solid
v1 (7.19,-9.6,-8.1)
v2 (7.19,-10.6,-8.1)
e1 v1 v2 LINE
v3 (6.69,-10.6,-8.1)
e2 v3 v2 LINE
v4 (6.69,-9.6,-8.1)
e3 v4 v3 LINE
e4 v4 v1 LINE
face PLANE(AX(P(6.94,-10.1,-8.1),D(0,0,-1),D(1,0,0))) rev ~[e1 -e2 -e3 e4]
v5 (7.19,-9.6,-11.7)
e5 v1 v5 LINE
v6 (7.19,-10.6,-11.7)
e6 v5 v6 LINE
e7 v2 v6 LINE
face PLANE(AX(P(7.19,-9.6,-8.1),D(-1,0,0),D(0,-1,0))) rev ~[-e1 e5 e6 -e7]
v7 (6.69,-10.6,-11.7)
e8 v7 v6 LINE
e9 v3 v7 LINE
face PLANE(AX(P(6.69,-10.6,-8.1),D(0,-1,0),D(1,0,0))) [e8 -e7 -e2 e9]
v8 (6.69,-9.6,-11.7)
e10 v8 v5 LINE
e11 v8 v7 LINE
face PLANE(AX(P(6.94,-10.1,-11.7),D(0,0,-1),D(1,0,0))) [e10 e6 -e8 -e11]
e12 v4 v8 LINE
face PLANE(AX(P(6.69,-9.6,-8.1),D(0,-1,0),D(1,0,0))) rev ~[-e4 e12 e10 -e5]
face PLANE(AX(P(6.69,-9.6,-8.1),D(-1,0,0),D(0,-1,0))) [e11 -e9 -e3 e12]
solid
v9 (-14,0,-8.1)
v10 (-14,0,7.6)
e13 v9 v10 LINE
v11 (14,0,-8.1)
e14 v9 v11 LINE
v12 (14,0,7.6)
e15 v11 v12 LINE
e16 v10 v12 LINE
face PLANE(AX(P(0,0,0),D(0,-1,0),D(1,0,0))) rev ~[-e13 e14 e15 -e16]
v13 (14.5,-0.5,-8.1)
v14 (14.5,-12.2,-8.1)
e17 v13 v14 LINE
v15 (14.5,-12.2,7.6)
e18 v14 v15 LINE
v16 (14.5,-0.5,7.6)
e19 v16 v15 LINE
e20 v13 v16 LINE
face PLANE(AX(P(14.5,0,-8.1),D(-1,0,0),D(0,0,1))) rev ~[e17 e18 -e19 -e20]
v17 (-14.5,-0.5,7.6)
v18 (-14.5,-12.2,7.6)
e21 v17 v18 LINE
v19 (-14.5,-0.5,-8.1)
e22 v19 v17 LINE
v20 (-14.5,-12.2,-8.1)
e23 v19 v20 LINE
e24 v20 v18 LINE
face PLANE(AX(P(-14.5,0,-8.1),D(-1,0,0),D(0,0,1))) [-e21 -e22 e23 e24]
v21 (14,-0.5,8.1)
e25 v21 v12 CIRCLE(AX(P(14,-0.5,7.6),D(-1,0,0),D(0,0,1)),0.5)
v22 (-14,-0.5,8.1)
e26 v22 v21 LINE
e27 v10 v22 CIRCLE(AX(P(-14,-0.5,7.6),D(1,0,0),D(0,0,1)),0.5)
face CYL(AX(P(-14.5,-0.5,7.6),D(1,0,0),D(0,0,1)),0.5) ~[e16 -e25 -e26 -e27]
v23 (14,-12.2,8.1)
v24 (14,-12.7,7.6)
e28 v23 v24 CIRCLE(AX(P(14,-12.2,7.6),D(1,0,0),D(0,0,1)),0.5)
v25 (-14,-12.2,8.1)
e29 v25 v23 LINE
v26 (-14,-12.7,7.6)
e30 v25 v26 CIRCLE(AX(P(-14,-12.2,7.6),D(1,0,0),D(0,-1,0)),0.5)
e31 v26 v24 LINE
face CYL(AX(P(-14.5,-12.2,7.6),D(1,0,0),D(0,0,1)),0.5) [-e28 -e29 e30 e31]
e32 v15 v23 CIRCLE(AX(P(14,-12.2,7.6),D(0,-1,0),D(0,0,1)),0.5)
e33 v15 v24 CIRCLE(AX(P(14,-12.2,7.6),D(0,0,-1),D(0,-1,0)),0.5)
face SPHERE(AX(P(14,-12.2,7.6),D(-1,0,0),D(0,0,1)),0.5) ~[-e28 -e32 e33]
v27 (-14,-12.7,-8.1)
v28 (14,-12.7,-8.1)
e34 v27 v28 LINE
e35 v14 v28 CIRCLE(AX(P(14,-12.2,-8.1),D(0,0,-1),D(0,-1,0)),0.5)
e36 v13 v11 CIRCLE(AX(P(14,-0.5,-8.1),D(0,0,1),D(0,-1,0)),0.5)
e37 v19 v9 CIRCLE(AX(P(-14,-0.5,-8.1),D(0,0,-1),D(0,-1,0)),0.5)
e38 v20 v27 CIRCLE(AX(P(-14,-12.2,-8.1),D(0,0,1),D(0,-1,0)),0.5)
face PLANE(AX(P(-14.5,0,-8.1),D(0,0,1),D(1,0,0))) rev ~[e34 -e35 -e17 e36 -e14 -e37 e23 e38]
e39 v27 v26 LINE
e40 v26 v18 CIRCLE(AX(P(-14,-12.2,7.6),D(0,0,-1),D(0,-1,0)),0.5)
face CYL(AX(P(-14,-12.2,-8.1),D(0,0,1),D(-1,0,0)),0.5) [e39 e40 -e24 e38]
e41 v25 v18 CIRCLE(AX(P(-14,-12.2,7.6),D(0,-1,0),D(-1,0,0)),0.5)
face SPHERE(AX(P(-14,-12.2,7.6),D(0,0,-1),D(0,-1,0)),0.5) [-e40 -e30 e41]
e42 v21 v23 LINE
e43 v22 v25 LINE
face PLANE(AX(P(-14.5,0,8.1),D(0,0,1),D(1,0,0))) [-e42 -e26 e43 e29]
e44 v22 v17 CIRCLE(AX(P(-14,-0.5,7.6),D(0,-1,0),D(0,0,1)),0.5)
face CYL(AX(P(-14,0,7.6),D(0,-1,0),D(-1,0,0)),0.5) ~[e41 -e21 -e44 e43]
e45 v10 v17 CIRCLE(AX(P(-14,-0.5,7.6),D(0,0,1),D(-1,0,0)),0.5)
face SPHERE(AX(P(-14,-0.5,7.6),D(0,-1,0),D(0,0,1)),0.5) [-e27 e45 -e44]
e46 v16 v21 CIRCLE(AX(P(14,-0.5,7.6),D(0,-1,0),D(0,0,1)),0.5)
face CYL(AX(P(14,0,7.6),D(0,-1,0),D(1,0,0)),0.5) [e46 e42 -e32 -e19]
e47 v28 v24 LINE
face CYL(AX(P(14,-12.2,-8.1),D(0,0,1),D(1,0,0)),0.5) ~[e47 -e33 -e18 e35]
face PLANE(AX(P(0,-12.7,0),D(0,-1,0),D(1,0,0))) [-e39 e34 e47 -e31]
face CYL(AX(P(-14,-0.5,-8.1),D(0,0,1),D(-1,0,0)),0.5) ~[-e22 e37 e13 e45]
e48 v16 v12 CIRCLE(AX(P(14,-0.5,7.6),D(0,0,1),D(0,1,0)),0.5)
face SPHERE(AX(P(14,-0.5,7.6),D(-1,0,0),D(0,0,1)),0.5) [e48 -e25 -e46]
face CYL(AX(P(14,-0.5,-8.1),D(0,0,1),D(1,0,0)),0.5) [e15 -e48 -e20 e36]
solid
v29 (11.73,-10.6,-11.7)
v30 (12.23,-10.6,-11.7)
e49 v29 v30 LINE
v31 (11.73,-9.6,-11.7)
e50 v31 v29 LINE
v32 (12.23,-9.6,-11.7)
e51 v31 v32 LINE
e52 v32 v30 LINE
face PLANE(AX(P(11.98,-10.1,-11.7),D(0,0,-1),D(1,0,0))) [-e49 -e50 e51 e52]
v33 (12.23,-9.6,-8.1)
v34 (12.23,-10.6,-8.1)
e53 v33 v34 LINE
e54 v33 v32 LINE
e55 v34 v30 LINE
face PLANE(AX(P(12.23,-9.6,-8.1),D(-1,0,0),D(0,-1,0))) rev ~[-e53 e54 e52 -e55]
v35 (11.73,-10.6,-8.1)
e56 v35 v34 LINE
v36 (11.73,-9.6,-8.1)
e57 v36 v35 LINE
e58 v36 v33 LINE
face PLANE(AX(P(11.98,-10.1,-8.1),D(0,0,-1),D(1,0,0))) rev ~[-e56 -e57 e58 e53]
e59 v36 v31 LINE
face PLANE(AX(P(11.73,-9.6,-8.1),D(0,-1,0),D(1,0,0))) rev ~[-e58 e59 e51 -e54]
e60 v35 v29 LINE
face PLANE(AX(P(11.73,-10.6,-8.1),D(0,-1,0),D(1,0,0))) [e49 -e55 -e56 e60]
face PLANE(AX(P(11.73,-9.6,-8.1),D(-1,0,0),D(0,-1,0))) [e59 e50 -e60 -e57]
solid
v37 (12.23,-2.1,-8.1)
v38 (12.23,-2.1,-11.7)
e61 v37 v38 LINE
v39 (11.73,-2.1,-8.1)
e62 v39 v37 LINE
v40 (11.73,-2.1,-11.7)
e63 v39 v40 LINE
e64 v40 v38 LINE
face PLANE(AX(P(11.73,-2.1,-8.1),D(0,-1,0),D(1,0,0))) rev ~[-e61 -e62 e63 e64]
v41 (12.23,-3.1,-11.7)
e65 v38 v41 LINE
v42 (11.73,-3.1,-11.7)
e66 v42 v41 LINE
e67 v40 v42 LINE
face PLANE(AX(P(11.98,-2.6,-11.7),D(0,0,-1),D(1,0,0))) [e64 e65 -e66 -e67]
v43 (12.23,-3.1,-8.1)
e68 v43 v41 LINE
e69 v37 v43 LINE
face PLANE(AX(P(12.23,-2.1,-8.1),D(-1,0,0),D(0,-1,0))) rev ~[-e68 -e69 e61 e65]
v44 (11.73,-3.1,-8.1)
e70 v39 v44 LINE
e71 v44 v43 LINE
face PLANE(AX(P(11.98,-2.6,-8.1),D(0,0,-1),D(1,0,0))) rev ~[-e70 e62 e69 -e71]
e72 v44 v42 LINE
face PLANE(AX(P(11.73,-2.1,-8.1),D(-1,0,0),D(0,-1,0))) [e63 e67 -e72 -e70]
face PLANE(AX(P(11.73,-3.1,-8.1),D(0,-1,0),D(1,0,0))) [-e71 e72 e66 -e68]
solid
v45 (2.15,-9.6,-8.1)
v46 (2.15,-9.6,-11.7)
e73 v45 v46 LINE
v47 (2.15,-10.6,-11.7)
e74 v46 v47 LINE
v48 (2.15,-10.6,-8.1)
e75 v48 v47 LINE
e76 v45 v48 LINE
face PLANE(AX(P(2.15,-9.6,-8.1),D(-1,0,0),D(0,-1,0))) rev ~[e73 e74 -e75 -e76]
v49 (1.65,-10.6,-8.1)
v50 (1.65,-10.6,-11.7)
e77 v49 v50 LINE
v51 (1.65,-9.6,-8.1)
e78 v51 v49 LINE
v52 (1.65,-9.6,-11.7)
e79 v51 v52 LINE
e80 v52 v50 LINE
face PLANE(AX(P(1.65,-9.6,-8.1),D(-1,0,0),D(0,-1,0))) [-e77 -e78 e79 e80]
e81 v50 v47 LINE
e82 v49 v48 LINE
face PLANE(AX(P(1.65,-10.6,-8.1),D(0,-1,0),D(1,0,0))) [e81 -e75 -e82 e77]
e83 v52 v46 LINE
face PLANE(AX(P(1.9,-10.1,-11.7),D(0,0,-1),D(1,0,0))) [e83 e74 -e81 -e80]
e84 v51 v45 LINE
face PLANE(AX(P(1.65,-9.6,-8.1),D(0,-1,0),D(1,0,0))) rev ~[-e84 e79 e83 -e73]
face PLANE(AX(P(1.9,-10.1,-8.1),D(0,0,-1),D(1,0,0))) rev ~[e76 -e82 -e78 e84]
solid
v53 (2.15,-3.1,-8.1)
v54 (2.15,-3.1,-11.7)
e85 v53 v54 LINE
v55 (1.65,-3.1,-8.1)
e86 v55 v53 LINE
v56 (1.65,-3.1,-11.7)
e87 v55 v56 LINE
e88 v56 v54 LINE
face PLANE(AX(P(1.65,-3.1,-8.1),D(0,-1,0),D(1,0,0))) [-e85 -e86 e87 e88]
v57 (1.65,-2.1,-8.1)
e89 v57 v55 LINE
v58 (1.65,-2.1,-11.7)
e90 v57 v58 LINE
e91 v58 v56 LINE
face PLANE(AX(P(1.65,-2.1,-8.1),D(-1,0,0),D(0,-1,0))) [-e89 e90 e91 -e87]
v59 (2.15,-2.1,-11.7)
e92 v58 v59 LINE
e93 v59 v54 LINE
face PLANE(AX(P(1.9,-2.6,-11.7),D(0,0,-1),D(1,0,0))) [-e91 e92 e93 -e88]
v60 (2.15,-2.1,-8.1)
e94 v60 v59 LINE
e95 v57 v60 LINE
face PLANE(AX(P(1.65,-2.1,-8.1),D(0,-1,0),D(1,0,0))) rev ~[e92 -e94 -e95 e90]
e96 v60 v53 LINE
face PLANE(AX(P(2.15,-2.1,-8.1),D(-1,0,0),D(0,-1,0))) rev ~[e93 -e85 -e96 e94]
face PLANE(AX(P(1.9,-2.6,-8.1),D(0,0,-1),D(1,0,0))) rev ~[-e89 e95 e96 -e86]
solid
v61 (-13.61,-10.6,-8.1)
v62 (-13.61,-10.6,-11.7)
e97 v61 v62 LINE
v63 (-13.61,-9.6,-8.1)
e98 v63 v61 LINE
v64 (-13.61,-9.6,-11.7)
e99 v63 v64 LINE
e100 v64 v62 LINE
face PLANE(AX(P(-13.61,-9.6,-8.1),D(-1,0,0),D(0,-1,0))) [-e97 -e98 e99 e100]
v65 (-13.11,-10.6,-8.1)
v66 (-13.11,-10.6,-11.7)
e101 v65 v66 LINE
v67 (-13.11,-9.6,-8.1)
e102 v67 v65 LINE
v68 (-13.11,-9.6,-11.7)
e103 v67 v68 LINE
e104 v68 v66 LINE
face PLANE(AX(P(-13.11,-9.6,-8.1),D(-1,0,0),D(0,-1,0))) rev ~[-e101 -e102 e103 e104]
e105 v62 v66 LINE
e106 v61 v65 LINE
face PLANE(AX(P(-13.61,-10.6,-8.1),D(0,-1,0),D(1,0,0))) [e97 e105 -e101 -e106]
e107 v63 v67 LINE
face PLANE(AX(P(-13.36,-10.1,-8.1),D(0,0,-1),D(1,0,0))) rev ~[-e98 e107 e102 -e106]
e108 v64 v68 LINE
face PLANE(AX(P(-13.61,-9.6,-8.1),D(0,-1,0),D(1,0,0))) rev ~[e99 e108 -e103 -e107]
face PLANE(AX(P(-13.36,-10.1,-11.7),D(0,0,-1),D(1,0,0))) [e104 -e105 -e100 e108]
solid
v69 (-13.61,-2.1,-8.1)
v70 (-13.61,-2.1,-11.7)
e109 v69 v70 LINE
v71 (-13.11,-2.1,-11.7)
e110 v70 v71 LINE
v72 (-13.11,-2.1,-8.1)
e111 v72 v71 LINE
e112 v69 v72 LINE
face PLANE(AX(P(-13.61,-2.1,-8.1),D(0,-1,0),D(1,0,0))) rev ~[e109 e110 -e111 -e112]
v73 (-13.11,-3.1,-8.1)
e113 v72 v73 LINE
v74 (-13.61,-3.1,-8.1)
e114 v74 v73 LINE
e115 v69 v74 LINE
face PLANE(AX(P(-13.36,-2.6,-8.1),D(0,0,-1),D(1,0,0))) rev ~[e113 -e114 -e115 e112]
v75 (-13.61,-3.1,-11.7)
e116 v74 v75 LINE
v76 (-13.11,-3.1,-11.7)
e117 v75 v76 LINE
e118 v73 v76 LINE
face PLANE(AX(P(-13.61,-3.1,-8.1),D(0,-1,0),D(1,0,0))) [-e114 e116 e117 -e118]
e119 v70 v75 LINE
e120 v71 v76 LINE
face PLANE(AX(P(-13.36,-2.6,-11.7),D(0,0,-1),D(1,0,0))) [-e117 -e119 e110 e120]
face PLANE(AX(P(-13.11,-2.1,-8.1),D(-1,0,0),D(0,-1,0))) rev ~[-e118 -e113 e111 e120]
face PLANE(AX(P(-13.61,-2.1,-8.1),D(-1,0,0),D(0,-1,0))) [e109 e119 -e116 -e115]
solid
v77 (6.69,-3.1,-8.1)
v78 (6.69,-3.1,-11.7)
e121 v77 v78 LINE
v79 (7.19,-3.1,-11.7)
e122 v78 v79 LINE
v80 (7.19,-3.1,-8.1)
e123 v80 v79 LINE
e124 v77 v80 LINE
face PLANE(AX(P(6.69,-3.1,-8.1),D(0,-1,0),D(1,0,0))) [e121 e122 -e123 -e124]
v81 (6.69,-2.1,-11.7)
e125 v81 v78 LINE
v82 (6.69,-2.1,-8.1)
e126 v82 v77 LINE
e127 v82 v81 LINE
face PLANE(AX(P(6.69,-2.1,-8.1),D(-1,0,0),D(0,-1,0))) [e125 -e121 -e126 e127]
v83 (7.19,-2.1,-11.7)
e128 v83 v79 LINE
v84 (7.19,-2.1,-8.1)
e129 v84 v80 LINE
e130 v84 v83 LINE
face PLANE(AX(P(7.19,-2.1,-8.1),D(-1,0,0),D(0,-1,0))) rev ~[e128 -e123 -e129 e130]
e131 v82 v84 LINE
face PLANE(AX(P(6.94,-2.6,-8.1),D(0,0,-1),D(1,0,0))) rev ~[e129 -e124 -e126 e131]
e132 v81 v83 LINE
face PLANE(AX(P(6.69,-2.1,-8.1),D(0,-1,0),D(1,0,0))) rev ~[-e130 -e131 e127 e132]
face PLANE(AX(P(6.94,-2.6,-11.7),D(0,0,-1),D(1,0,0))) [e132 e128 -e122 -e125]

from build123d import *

# Parameters (mm, degrees)
F0_W     = 29
F0_H     = 16.2
F1_DEPTH = 12.7
F2_W     = 0.5
F2_H     = 1
F3_DEPTH = 3.6
F4_R     = 0.5


# Not quite as in the source:
# - a feature names something its author has since deleted; it is built from what else it names


with BuildPart() as f1:
    # F0 (on Front) → F1 (new body)
    with BuildSketch(Plane.XZ):
        Rectangle(F0_W, F0_H)
    extrude(amount=F1_DEPTH)

    # F4
    f4_edges = [f1.edges().sort_by_distance(p)[0] for p in [
        (-14.5, -12.7, 0),
        (0, -12.7, 8.1),
        (-14.5, -6.35, 8.1),
        (0, 0, 8.1),
        (14.5, -6.35, 8.1),
        (14.5, -12.7, 0),
        (14.5, 0, 0),
        (-14.5, 0, 0),
    ]]
    fillet(f4_edges, radius=F4_R)


with BuildPart() as f3:
    # F2 (on face) → F3 (new body)
    with BuildSketch(Plane(origin=(0, 0, -8.1), x_dir=(1, 0, 0), z_dir=(0, 0, -1))):
        with Locations((1.9, 2.6)):
            Rectangle(F2_W, F2_H)
    extrude(amount=F3_DEPTH)


with BuildPart() as f3b:
    # F2 (on face) → F3, piece 2 (new body)
    with BuildSketch(Plane(origin=(0, 0, -8.1), x_dir=(1, 0, 0), z_dir=(0, 0, -1))):
        with Locations((1.9, 10.1)):
            Rectangle(F2_W, F2_H)
    extrude(amount=F3_DEPTH)


with BuildPart() as f3c:
    # F2 (on face) → F3, piece 3 (new body)
    with BuildSketch(Plane(origin=(0, 0, -8.1), x_dir=(1, 0, 0), z_dir=(0, 0, -1))):
        with Locations((6.94, 10.1)):
            Rectangle(F2_W, F2_H)
    extrude(amount=F3_DEPTH)


with BuildPart() as f3d:
    # F2 (on face) → F3, piece 4 (new body)
    with BuildSketch(Plane(origin=(0, 0, -8.1), x_dir=(1, 0, 0), z_dir=(0, 0, -1))):
        with Locations((11.98, 10.1)):
            Rectangle(F2_W, F2_H)
    extrude(amount=F3_DEPTH)


with BuildPart() as f3e:
    # F2 (on face) → F3, piece 5 (new body)
    with BuildSketch(Plane(origin=(0, 0, -8.1), x_dir=(1, 0, 0), z_dir=(0, 0, -1))):
        with Locations((6.94, 2.6)):
            Rectangle(F2_W, F2_H)
    extrude(amount=F3_DEPTH)


with BuildPart() as f3f:
    # F2 (on face) → F3, piece 6 (new body)
    with BuildSketch(Plane(origin=(0, 0, -8.1), x_dir=(1, 0, 0), z_dir=(0, 0, -1))):
        with Locations((11.98, 2.6)):
            Rectangle(F2_W, F2_H)
    extrude(amount=F3_DEPTH)


with BuildPart() as f3g:
    # F2 (on face) → F3, piece 7 (new body)
    with BuildSketch(Plane(origin=(0, 0, -8.1), x_dir=(1, 0, 0), z_dir=(0, 0, -1))):
        with Locations((-13.36, 10.1)):
            Rectangle(F2_W, F2_H)
    extrude(amount=F3_DEPTH)


with BuildPart() as f3h:
    # F2 (on face) → F3, piece 8 (new body)
    with BuildSketch(Plane(origin=(0, 0, -8.1), x_dir=(1, 0, 0), z_dir=(0, 0, -1))):
        with Locations((-13.36, 2.6)):
            Rectangle(F2_W, F2_H)
    extrude(amount=F3_DEPTH)


solid = Compound([f1.part, f3.part, f3b.part, f3c.part, f3d.part, f3e.part, f3f.part, f3g.part, f3h.part])
